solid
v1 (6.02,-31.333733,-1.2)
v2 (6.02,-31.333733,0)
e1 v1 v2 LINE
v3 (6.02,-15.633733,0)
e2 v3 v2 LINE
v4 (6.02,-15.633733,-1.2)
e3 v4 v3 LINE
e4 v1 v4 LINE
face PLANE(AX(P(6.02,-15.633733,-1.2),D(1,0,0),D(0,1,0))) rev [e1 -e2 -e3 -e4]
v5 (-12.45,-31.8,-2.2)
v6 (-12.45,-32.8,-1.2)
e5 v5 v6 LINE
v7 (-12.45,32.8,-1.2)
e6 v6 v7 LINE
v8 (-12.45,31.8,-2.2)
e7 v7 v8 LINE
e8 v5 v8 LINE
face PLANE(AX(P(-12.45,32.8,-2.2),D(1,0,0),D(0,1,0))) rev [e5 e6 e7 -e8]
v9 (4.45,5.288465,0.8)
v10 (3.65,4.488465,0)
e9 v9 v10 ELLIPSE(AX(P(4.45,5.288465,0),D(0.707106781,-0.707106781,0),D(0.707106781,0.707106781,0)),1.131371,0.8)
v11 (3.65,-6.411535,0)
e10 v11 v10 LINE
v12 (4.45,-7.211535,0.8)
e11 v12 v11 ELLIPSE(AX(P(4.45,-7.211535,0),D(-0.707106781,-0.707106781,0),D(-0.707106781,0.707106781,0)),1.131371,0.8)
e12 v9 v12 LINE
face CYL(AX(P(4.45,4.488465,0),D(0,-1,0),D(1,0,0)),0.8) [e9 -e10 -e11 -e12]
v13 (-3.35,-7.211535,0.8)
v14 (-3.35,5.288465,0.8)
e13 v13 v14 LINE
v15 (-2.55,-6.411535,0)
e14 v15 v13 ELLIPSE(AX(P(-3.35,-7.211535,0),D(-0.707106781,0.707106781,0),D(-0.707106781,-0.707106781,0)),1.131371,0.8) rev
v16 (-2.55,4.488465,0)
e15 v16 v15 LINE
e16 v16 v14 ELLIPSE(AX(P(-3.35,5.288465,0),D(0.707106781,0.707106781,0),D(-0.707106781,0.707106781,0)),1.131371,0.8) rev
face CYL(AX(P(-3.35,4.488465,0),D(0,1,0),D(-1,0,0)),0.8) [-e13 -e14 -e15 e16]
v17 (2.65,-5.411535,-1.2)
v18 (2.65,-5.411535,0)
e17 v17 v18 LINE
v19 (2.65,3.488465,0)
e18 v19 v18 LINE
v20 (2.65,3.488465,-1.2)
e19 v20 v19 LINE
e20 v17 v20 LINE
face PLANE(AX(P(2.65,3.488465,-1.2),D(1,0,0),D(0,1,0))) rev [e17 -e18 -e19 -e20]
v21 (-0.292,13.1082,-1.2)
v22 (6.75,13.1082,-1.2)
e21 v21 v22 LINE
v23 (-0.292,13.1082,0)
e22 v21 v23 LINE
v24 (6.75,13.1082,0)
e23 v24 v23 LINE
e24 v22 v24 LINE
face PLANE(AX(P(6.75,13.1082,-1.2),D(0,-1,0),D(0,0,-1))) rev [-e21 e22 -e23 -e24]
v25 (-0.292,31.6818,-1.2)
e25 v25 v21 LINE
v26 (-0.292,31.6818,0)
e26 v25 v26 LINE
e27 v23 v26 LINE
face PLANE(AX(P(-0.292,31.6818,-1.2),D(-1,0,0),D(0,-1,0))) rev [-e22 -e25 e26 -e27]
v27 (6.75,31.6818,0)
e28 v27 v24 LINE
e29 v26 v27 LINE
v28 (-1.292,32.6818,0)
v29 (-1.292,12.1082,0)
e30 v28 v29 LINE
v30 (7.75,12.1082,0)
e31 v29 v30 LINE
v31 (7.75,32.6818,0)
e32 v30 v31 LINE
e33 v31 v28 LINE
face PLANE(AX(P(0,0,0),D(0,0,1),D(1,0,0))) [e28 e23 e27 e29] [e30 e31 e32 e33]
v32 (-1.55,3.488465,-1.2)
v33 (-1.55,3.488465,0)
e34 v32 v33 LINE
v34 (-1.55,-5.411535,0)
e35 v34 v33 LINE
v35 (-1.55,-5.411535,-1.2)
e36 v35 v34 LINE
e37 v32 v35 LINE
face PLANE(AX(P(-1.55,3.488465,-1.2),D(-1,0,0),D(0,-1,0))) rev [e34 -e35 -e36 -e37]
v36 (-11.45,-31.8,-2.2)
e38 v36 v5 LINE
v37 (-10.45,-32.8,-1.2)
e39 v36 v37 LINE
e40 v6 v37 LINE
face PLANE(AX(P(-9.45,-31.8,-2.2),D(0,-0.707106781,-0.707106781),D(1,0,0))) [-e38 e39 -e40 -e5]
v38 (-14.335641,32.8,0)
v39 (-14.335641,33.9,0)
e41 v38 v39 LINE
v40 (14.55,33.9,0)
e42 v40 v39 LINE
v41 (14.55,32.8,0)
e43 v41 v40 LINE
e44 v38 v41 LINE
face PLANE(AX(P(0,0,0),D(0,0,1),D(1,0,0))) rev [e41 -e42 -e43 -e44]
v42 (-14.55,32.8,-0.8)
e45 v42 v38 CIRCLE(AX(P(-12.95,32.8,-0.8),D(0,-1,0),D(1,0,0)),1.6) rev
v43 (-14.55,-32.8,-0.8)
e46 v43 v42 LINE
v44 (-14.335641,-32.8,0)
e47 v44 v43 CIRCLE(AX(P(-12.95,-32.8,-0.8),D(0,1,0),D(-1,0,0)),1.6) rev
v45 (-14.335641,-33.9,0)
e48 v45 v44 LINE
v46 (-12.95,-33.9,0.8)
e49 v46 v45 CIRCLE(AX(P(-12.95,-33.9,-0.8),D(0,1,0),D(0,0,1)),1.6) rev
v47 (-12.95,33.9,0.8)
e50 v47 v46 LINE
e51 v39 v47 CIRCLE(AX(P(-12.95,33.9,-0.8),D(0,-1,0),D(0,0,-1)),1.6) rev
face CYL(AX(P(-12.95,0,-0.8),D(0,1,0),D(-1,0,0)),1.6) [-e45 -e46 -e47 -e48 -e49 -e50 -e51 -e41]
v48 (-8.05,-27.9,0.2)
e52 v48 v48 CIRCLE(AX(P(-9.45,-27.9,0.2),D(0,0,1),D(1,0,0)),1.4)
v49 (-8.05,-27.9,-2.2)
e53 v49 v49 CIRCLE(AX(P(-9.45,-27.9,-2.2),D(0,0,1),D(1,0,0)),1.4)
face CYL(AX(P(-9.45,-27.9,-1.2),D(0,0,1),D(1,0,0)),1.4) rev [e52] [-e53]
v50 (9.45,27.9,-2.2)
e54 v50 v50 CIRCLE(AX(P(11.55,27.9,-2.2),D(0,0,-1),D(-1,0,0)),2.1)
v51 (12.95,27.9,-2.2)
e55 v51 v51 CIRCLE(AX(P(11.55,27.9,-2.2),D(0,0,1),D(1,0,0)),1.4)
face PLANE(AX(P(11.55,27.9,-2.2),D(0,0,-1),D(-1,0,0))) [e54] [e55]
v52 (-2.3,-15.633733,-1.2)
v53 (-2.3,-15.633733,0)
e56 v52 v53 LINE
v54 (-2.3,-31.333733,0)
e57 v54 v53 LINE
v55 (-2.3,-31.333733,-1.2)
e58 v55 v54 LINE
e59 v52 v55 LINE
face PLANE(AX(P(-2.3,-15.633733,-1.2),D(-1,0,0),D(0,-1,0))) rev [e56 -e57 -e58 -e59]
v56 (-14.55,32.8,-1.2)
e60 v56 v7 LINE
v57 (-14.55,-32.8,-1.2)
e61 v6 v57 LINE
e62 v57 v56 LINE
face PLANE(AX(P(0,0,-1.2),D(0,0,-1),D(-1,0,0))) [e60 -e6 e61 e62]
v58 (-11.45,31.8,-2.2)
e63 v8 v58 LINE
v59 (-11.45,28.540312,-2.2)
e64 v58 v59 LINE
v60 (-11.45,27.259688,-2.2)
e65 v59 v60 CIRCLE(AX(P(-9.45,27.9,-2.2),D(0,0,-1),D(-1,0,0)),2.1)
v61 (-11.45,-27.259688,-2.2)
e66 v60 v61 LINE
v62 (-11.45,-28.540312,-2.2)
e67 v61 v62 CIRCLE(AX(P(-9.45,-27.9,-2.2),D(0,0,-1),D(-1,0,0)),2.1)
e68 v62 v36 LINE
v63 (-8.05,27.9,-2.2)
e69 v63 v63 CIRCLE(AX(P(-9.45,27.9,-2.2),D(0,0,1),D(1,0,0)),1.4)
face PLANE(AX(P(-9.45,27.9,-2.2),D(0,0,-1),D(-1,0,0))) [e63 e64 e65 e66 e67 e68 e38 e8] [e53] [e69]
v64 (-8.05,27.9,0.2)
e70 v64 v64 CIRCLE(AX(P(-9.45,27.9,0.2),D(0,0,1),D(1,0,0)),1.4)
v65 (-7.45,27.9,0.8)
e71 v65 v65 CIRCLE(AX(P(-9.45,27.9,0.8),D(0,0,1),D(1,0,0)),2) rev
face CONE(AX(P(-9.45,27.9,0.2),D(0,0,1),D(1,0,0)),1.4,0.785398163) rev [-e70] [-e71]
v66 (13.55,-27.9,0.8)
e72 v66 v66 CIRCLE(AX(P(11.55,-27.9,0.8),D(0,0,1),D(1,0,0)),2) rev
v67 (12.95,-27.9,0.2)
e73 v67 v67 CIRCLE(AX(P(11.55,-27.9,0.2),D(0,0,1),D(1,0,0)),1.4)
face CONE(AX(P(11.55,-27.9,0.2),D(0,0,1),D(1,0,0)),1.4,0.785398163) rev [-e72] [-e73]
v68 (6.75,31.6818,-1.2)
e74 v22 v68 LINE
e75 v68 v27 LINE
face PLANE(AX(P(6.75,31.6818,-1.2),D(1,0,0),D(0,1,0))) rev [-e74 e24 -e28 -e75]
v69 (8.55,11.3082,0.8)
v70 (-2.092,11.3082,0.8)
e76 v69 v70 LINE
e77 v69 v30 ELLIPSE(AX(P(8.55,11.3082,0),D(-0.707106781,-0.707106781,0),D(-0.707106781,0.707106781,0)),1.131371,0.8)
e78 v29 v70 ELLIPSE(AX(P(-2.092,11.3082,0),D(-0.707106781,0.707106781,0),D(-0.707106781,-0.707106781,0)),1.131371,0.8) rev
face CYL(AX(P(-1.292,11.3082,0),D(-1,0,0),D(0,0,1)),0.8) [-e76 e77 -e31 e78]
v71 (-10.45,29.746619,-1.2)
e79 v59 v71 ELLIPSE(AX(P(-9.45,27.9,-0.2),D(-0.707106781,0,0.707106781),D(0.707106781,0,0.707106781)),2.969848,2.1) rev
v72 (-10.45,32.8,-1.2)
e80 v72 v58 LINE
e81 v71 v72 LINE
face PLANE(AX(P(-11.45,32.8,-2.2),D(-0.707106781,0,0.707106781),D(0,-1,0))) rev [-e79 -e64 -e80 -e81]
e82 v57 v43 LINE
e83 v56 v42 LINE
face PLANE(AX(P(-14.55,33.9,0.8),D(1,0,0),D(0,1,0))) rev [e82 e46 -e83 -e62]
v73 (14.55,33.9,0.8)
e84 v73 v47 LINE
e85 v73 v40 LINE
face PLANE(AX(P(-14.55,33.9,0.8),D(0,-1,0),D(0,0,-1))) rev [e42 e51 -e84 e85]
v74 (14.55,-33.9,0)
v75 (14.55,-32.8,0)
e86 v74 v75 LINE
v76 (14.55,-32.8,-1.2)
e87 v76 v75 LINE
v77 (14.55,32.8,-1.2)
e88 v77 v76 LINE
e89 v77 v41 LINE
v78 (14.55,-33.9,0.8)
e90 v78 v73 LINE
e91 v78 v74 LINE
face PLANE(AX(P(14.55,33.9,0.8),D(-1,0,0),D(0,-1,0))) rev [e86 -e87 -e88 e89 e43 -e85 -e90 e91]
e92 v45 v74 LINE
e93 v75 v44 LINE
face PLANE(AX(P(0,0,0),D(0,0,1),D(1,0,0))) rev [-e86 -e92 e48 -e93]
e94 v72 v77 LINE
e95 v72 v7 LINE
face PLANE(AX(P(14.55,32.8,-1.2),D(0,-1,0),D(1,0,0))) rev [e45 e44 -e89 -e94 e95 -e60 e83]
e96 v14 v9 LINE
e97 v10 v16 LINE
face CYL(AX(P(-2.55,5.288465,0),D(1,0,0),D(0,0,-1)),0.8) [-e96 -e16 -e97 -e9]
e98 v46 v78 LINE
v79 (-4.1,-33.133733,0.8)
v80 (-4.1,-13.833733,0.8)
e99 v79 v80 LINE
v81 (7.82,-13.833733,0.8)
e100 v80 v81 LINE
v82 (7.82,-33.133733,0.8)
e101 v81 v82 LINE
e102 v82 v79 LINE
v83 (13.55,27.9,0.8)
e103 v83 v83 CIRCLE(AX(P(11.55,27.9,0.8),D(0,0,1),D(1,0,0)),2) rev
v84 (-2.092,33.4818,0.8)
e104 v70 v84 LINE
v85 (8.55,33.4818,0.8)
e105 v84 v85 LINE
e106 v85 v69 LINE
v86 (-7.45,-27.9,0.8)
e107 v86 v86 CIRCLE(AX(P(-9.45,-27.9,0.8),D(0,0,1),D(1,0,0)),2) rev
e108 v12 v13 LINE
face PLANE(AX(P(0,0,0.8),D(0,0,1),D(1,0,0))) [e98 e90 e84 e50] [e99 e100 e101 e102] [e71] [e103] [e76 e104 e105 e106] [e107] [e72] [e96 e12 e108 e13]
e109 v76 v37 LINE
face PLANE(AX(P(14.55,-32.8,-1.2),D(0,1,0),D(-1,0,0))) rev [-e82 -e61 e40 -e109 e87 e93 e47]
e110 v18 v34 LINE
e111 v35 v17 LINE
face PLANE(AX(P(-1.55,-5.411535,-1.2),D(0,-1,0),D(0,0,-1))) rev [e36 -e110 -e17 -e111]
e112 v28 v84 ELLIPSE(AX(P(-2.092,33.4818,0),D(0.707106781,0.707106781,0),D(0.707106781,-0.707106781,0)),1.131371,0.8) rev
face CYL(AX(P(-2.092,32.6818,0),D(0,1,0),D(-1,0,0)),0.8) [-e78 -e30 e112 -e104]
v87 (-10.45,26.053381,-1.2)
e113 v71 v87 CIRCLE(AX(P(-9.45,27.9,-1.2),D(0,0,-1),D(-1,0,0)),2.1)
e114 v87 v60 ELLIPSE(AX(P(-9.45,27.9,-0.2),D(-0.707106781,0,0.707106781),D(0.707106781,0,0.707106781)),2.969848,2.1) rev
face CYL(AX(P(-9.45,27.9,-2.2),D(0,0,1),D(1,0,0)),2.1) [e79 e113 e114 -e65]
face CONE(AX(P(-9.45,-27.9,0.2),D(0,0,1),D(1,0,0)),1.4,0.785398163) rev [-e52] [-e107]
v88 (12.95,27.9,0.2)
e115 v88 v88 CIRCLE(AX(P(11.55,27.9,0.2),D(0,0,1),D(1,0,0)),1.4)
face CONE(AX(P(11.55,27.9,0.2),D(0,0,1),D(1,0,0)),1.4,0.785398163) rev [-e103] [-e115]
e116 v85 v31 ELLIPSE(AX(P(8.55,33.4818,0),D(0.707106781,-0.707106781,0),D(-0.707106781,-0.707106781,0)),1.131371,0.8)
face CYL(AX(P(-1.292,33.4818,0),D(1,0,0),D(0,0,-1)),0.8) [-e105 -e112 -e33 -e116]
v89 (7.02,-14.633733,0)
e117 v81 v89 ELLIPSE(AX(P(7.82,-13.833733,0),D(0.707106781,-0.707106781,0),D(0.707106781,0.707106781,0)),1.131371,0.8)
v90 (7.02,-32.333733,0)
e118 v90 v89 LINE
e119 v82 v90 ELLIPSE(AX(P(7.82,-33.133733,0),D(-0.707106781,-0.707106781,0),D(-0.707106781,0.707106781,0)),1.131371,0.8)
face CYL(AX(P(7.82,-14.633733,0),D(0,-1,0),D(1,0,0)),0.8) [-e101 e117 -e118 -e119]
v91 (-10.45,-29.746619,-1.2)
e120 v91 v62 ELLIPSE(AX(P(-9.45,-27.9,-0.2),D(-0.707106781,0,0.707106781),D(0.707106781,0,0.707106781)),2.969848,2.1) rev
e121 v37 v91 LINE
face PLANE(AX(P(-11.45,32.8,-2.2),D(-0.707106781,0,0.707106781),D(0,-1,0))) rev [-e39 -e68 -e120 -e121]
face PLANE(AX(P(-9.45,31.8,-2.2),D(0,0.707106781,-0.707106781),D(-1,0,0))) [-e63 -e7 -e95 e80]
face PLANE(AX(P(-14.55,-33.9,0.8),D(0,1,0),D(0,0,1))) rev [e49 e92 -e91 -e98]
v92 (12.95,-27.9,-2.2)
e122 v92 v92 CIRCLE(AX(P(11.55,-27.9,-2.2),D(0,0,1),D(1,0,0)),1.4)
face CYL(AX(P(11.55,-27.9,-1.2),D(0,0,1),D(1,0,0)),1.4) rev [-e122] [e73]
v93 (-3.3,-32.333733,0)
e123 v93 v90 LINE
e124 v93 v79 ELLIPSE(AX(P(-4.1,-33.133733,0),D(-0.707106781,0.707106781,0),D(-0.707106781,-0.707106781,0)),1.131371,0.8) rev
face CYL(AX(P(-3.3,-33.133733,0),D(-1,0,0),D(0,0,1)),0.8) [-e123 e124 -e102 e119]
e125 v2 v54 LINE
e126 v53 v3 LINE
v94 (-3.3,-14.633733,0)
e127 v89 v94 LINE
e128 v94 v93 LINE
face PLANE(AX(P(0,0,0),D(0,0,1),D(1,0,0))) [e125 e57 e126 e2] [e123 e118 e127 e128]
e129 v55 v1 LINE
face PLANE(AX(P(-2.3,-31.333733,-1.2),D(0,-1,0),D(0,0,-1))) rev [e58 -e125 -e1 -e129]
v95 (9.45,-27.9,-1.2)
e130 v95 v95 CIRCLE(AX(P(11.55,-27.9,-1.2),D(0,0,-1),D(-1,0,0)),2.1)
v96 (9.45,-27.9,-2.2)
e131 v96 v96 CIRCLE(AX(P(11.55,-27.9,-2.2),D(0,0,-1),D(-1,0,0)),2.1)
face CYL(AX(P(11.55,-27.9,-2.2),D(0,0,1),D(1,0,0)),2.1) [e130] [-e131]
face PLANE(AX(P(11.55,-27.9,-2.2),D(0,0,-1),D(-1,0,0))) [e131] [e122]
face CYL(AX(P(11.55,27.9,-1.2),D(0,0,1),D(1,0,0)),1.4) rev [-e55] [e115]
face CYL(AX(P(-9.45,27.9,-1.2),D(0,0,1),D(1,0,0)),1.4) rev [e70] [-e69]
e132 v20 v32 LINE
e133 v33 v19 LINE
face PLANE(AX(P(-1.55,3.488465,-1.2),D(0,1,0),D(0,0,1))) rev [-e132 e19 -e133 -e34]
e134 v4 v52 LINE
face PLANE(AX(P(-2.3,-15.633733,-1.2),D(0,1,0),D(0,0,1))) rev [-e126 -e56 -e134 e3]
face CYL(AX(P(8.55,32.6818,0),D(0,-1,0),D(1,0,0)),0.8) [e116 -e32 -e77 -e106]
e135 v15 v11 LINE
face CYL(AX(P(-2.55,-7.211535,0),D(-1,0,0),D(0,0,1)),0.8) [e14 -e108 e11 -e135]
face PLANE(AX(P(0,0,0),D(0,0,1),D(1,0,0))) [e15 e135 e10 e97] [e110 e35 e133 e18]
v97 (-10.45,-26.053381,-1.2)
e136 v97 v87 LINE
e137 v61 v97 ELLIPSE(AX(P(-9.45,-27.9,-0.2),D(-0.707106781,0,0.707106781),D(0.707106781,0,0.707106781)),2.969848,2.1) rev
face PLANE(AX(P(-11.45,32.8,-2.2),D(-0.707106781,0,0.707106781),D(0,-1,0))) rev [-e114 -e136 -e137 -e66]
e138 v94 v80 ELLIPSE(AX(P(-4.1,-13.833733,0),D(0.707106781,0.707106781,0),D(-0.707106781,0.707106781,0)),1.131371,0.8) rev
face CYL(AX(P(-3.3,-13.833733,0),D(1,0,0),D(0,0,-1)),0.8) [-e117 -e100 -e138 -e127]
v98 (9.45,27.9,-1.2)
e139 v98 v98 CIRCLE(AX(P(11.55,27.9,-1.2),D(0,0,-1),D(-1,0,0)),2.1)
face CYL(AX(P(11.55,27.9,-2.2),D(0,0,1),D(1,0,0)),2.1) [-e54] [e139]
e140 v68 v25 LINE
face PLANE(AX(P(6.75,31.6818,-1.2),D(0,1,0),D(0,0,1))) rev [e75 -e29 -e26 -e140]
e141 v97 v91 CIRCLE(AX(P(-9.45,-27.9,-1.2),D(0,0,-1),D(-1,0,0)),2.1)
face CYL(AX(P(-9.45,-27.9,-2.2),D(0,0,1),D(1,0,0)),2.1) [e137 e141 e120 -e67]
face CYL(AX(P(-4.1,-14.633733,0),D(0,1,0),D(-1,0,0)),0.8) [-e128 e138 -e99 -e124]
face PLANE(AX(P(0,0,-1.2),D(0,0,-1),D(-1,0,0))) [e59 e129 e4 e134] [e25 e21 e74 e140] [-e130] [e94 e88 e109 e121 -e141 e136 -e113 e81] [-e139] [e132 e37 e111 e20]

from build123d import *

# Parameters (mm, degrees)
SKETCH_2_W          = 29.1
SKETCH_2_H          = 67.8
EXTRUDE_1_DEPTH     = 0.8
SKETCH_3_W          = 29.1
SKETCH_3_H          = 65.6
EXTRUDE_2_DEPTH     = 1.2
SKETCH_4_R          = 1.4
SKETCH_4_W          = 7.042
SKETCH_4_H          = 18.5736
SKETCH_4_W_2        = 4.2
SKETCH_4_H_2        = 8.9
SKETCH_4_W_3        = 8.32
SKETCH_4_H_3        = 15.7
CUT_EXTRUDE_1_DEPTH = 37.944722221
SKETCH_5_R          = 2.1
SKETCH_5_R_2        = 1.1
SKETCH_5_R_3        = 1
EXTRUDE_3_DEPTH     = 1
SKETCH_6_W          = 1
SKETCH_6_H          = 65.6
EXTRUDE_4_DEPTH     = 1
CHAMFER_1_SIZE      = 1
CHAMFER_3_SIZE      = 1
SKETCH_7_W          = 9.042
SKETCH_7_H          = 20.5736
SKETCH_7_W_2        = 6.2
SKETCH_7_H_2        = 10.9
SKETCH_7_W_3        = 10.32
SKETCH_7_H_3        = 17.7
CUT_EXTRUDE_2_DEPTH = 0.8
FILLET_3_R          = 0.8
FILLET_4_R          = 0.8
FILLET_5_R          = 0.8
SKETCH_8_R          = 1.4
CUT_EXTRUDE_3_DEPTH = 37.944722221
CHAMFER_4_SIZE      = 0.6
FILLET_6_R          = 1.6


with BuildPart() as part:
    # Эскиз2 → Бобышка-Вытянуть1 (new body)
    with BuildSketch(Plane.XY):
        Rectangle(SKETCH_2_W, SKETCH_2_H)
    extrude(amount=EXTRUDE_1_DEPTH)

    # Эскиз3 → Бобышка-Вытянуть2 (add)
    with BuildSketch(Plane(origin=(0, 0, 0), x_dir=(-1, 0, 0), z_dir=(0, 0, -1))):
        Rectangle(SKETCH_3_W, SKETCH_3_H)
    extrude(amount=EXTRUDE_2_DEPTH)

    # Эскиз4 → Вырез-Вытянуть1 (cut, through all)
    with BuildSketch(Plane.XY.offset(0.8)):
        with Locations((-9.45, -27.9)):
            Circle(SKETCH_4_R)
        with Locations((11.55, -27.9)):
            Circle(SKETCH_4_R)
        with Locations((11.55, 27.9)):
            Circle(SKETCH_4_R)
        with Locations((-9.45, 27.9)):
            Circle(SKETCH_4_R)
        with Locations((3.229, 22.395)):
            Rectangle(SKETCH_4_W, SKETCH_4_H)
        with Locations((0.55, -0.961534596)):
            Rectangle(SKETCH_4_W_2, SKETCH_4_H_2)
        with Locations((1.86, -23.483733333)):
            Rectangle(SKETCH_4_W_3, SKETCH_4_H_3)
    extrude(amount=-CUT_EXTRUDE_1_DEPTH, mode=Mode.SUBTRACT)

    # Эскиз5 → Бобышка-Вытянуть3 (add)
    # profile 1 of 4: a face of its own
    with BuildSketch(Plane(origin=(0, 0, -1.2), x_dir=(-1, 0, 0), z_dir=(0, 0, -1))):
        with Locations((-11.55, 27.9)):
            Circle(SKETCH_5_R)
        with Locations((-11.55, 27.9)):
            Circle(SKETCH_5_R_2, mode=Mode.SUBTRACT)
    # profile 2 of 4: a face of its own
    with BuildSketch(Plane(origin=(0, 0, -1.2), x_dir=(-1, 0, 0), z_dir=(0, 0, -1))):
        with Locations((-11.55, -27.9)):
            Circle(SKETCH_5_R)
        with Locations((-11.55, -27.9)):
            Circle(SKETCH_5_R_2, mode=Mode.SUBTRACT)
    # profile 3 of 4: a face of its own
    with BuildSketch(Plane(origin=(0, 0, -1.2), x_dir=(-1, 0, 0), z_dir=(0, 0, -1))):
        with Locations((9.45, 27.9)):
            Circle(SKETCH_5_R)
        with Locations((9.45, 27.9)):
            Circle(SKETCH_5_R_3, mode=Mode.SUBTRACT)
    # profile 4 of 4: a face of its own
    with BuildSketch(Plane(origin=(0, 0, -1.2), x_dir=(-1, 0, 0), z_dir=(0, 0, -1))):
        with Locations((9.45, -27.9)):
            Circle(SKETCH_5_R)
        with Locations((9.45, -27.9)):
            Circle(SKETCH_5_R_3, mode=Mode.SUBTRACT)
    extrude(amount=EXTRUDE_3_DEPTH)

    # Эскиз6 → Бобышка-Вытянуть4 (add)
    with BuildSketch(Plane(origin=(0, 0, -1.2), x_dir=(-1, 0, 0), z_dir=(0, 0, -1))):
        with Locations((11.95, 0)):
            Rectangle(SKETCH_6_W, SKETCH_6_H)
    extrude(amount=EXTRUDE_4_DEPTH)

    # Фаска1
    chamfer_1_edges = [part.edges().sort_by_distance(p)[0] for p in [
        (-11.95, -32.8, -2.2),
        (-11.95, 32.8, -2.2),
    ]]
    chamfer(chamfer_1_edges, length=CHAMFER_1_SIZE)

    # Фаска3
    chamfer_3_edges = [part.edges().sort_by_distance(p)[0] for p in [
        (-11.45, -30.670156212, -1.2),
        (-11.45, 30.670156212, -1.2),
        (-11.45, 0, -1.2),
    ]]
    chamfer(chamfer_3_edges, length=CHAMFER_3_SIZE - 0.0001)  # a hair under: the kernel refuses the full size

    # Эскиз7 → Вырез-Вытянуть2 (cut)
    with BuildSketch(Plane.XY.offset(0.8)):
        with Locations((3.229, 22.395)):
            Rectangle(SKETCH_7_W, SKETCH_7_H)
        with Locations((0.55, -0.961534596)):
            Rectangle(SKETCH_7_W_2, SKETCH_7_H_2)
        with Locations((1.86, -23.483733333)):
            Rectangle(SKETCH_7_W_3, SKETCH_7_H_3)
    extrude(amount=-CUT_EXTRUDE_2_DEPTH, mode=Mode.SUBTRACT)

    # Скругление3
    fillet_3_edges = [part.edges().sort_by_distance(p)[0] for p in [
        (3.229, 12.1082, 0.8),
        (7.75, 22.395, 0.8),
        (3.229, 32.6818, 0.8),
        (-1.292, 22.395, 0.8),
    ]]
    fillet(fillet_3_edges, radius=FILLET_3_R - 0.0001)  # a hair under: the kernel refuses the full size

    # Скругление4
    fillet_4_edges = [part.edges().sort_by_distance(p)[0] for p in [
        (0.55, -6.411534596, 0.8),
        (-2.55, -0.961534596, 0.8),
        (0.55, 4.488465404, 0.8),
        (3.65, -0.961534596, 0.8),
    ]]
    fillet(fillet_4_edges, radius=FILLET_4_R - 0.0001)  # a hair under: the kernel refuses the full size

    # Скругление5
    fillet_5_edges = [part.edges().sort_by_distance(p)[0] for p in [
        (1.86, -32.333733333, 0.8),
        (-3.3, -23.483733333, 0.8),
        (1.86, -14.633733333, 0.8),
        (7.02, -23.483733333, 0.8),
    ]]
    fillet(fillet_5_edges, radius=FILLET_5_R - 0.0001)  # a hair under: the kernel refuses the full size

    # Эскиз8 → Вырез-Вытянуть3 (cut, through all)
    with BuildSketch(Plane.XY.offset(-1.2)):
        with Locations((11.55, 27.9)):
            Circle(SKETCH_8_R)
        with Locations((-9.45, -27.9)):
            Circle(SKETCH_8_R)
        with Locations((11.55, -27.9)):
            Circle(SKETCH_8_R)
        with Locations((-9.45, 27.9)):
            Circle(SKETCH_8_R)
    extrude(amount=-CUT_EXTRUDE_3_DEPTH, mode=Mode.SUBTRACT)

    # Фаска4
    chamfer_4_edges = [part.edges().sort_by_distance(p)[0] for p in [
        (10.15, -27.9, 0.8),
        (10.15, 27.9, 0.8),
        (-10.85, 27.9, 0.8),
        (-10.85, -27.9, 0.8),
    ]]
    chamfer(chamfer_4_edges, length=CHAMFER_4_SIZE)

    # Скругление6
    fillet_6_edges = [part.edges().sort_by_distance(p)[0] for p in [
        (-14.55, 0, 0.8),
    ]]
    fillet(fillet_6_edges, radius=FILLET_6_R)


solid = part.part
